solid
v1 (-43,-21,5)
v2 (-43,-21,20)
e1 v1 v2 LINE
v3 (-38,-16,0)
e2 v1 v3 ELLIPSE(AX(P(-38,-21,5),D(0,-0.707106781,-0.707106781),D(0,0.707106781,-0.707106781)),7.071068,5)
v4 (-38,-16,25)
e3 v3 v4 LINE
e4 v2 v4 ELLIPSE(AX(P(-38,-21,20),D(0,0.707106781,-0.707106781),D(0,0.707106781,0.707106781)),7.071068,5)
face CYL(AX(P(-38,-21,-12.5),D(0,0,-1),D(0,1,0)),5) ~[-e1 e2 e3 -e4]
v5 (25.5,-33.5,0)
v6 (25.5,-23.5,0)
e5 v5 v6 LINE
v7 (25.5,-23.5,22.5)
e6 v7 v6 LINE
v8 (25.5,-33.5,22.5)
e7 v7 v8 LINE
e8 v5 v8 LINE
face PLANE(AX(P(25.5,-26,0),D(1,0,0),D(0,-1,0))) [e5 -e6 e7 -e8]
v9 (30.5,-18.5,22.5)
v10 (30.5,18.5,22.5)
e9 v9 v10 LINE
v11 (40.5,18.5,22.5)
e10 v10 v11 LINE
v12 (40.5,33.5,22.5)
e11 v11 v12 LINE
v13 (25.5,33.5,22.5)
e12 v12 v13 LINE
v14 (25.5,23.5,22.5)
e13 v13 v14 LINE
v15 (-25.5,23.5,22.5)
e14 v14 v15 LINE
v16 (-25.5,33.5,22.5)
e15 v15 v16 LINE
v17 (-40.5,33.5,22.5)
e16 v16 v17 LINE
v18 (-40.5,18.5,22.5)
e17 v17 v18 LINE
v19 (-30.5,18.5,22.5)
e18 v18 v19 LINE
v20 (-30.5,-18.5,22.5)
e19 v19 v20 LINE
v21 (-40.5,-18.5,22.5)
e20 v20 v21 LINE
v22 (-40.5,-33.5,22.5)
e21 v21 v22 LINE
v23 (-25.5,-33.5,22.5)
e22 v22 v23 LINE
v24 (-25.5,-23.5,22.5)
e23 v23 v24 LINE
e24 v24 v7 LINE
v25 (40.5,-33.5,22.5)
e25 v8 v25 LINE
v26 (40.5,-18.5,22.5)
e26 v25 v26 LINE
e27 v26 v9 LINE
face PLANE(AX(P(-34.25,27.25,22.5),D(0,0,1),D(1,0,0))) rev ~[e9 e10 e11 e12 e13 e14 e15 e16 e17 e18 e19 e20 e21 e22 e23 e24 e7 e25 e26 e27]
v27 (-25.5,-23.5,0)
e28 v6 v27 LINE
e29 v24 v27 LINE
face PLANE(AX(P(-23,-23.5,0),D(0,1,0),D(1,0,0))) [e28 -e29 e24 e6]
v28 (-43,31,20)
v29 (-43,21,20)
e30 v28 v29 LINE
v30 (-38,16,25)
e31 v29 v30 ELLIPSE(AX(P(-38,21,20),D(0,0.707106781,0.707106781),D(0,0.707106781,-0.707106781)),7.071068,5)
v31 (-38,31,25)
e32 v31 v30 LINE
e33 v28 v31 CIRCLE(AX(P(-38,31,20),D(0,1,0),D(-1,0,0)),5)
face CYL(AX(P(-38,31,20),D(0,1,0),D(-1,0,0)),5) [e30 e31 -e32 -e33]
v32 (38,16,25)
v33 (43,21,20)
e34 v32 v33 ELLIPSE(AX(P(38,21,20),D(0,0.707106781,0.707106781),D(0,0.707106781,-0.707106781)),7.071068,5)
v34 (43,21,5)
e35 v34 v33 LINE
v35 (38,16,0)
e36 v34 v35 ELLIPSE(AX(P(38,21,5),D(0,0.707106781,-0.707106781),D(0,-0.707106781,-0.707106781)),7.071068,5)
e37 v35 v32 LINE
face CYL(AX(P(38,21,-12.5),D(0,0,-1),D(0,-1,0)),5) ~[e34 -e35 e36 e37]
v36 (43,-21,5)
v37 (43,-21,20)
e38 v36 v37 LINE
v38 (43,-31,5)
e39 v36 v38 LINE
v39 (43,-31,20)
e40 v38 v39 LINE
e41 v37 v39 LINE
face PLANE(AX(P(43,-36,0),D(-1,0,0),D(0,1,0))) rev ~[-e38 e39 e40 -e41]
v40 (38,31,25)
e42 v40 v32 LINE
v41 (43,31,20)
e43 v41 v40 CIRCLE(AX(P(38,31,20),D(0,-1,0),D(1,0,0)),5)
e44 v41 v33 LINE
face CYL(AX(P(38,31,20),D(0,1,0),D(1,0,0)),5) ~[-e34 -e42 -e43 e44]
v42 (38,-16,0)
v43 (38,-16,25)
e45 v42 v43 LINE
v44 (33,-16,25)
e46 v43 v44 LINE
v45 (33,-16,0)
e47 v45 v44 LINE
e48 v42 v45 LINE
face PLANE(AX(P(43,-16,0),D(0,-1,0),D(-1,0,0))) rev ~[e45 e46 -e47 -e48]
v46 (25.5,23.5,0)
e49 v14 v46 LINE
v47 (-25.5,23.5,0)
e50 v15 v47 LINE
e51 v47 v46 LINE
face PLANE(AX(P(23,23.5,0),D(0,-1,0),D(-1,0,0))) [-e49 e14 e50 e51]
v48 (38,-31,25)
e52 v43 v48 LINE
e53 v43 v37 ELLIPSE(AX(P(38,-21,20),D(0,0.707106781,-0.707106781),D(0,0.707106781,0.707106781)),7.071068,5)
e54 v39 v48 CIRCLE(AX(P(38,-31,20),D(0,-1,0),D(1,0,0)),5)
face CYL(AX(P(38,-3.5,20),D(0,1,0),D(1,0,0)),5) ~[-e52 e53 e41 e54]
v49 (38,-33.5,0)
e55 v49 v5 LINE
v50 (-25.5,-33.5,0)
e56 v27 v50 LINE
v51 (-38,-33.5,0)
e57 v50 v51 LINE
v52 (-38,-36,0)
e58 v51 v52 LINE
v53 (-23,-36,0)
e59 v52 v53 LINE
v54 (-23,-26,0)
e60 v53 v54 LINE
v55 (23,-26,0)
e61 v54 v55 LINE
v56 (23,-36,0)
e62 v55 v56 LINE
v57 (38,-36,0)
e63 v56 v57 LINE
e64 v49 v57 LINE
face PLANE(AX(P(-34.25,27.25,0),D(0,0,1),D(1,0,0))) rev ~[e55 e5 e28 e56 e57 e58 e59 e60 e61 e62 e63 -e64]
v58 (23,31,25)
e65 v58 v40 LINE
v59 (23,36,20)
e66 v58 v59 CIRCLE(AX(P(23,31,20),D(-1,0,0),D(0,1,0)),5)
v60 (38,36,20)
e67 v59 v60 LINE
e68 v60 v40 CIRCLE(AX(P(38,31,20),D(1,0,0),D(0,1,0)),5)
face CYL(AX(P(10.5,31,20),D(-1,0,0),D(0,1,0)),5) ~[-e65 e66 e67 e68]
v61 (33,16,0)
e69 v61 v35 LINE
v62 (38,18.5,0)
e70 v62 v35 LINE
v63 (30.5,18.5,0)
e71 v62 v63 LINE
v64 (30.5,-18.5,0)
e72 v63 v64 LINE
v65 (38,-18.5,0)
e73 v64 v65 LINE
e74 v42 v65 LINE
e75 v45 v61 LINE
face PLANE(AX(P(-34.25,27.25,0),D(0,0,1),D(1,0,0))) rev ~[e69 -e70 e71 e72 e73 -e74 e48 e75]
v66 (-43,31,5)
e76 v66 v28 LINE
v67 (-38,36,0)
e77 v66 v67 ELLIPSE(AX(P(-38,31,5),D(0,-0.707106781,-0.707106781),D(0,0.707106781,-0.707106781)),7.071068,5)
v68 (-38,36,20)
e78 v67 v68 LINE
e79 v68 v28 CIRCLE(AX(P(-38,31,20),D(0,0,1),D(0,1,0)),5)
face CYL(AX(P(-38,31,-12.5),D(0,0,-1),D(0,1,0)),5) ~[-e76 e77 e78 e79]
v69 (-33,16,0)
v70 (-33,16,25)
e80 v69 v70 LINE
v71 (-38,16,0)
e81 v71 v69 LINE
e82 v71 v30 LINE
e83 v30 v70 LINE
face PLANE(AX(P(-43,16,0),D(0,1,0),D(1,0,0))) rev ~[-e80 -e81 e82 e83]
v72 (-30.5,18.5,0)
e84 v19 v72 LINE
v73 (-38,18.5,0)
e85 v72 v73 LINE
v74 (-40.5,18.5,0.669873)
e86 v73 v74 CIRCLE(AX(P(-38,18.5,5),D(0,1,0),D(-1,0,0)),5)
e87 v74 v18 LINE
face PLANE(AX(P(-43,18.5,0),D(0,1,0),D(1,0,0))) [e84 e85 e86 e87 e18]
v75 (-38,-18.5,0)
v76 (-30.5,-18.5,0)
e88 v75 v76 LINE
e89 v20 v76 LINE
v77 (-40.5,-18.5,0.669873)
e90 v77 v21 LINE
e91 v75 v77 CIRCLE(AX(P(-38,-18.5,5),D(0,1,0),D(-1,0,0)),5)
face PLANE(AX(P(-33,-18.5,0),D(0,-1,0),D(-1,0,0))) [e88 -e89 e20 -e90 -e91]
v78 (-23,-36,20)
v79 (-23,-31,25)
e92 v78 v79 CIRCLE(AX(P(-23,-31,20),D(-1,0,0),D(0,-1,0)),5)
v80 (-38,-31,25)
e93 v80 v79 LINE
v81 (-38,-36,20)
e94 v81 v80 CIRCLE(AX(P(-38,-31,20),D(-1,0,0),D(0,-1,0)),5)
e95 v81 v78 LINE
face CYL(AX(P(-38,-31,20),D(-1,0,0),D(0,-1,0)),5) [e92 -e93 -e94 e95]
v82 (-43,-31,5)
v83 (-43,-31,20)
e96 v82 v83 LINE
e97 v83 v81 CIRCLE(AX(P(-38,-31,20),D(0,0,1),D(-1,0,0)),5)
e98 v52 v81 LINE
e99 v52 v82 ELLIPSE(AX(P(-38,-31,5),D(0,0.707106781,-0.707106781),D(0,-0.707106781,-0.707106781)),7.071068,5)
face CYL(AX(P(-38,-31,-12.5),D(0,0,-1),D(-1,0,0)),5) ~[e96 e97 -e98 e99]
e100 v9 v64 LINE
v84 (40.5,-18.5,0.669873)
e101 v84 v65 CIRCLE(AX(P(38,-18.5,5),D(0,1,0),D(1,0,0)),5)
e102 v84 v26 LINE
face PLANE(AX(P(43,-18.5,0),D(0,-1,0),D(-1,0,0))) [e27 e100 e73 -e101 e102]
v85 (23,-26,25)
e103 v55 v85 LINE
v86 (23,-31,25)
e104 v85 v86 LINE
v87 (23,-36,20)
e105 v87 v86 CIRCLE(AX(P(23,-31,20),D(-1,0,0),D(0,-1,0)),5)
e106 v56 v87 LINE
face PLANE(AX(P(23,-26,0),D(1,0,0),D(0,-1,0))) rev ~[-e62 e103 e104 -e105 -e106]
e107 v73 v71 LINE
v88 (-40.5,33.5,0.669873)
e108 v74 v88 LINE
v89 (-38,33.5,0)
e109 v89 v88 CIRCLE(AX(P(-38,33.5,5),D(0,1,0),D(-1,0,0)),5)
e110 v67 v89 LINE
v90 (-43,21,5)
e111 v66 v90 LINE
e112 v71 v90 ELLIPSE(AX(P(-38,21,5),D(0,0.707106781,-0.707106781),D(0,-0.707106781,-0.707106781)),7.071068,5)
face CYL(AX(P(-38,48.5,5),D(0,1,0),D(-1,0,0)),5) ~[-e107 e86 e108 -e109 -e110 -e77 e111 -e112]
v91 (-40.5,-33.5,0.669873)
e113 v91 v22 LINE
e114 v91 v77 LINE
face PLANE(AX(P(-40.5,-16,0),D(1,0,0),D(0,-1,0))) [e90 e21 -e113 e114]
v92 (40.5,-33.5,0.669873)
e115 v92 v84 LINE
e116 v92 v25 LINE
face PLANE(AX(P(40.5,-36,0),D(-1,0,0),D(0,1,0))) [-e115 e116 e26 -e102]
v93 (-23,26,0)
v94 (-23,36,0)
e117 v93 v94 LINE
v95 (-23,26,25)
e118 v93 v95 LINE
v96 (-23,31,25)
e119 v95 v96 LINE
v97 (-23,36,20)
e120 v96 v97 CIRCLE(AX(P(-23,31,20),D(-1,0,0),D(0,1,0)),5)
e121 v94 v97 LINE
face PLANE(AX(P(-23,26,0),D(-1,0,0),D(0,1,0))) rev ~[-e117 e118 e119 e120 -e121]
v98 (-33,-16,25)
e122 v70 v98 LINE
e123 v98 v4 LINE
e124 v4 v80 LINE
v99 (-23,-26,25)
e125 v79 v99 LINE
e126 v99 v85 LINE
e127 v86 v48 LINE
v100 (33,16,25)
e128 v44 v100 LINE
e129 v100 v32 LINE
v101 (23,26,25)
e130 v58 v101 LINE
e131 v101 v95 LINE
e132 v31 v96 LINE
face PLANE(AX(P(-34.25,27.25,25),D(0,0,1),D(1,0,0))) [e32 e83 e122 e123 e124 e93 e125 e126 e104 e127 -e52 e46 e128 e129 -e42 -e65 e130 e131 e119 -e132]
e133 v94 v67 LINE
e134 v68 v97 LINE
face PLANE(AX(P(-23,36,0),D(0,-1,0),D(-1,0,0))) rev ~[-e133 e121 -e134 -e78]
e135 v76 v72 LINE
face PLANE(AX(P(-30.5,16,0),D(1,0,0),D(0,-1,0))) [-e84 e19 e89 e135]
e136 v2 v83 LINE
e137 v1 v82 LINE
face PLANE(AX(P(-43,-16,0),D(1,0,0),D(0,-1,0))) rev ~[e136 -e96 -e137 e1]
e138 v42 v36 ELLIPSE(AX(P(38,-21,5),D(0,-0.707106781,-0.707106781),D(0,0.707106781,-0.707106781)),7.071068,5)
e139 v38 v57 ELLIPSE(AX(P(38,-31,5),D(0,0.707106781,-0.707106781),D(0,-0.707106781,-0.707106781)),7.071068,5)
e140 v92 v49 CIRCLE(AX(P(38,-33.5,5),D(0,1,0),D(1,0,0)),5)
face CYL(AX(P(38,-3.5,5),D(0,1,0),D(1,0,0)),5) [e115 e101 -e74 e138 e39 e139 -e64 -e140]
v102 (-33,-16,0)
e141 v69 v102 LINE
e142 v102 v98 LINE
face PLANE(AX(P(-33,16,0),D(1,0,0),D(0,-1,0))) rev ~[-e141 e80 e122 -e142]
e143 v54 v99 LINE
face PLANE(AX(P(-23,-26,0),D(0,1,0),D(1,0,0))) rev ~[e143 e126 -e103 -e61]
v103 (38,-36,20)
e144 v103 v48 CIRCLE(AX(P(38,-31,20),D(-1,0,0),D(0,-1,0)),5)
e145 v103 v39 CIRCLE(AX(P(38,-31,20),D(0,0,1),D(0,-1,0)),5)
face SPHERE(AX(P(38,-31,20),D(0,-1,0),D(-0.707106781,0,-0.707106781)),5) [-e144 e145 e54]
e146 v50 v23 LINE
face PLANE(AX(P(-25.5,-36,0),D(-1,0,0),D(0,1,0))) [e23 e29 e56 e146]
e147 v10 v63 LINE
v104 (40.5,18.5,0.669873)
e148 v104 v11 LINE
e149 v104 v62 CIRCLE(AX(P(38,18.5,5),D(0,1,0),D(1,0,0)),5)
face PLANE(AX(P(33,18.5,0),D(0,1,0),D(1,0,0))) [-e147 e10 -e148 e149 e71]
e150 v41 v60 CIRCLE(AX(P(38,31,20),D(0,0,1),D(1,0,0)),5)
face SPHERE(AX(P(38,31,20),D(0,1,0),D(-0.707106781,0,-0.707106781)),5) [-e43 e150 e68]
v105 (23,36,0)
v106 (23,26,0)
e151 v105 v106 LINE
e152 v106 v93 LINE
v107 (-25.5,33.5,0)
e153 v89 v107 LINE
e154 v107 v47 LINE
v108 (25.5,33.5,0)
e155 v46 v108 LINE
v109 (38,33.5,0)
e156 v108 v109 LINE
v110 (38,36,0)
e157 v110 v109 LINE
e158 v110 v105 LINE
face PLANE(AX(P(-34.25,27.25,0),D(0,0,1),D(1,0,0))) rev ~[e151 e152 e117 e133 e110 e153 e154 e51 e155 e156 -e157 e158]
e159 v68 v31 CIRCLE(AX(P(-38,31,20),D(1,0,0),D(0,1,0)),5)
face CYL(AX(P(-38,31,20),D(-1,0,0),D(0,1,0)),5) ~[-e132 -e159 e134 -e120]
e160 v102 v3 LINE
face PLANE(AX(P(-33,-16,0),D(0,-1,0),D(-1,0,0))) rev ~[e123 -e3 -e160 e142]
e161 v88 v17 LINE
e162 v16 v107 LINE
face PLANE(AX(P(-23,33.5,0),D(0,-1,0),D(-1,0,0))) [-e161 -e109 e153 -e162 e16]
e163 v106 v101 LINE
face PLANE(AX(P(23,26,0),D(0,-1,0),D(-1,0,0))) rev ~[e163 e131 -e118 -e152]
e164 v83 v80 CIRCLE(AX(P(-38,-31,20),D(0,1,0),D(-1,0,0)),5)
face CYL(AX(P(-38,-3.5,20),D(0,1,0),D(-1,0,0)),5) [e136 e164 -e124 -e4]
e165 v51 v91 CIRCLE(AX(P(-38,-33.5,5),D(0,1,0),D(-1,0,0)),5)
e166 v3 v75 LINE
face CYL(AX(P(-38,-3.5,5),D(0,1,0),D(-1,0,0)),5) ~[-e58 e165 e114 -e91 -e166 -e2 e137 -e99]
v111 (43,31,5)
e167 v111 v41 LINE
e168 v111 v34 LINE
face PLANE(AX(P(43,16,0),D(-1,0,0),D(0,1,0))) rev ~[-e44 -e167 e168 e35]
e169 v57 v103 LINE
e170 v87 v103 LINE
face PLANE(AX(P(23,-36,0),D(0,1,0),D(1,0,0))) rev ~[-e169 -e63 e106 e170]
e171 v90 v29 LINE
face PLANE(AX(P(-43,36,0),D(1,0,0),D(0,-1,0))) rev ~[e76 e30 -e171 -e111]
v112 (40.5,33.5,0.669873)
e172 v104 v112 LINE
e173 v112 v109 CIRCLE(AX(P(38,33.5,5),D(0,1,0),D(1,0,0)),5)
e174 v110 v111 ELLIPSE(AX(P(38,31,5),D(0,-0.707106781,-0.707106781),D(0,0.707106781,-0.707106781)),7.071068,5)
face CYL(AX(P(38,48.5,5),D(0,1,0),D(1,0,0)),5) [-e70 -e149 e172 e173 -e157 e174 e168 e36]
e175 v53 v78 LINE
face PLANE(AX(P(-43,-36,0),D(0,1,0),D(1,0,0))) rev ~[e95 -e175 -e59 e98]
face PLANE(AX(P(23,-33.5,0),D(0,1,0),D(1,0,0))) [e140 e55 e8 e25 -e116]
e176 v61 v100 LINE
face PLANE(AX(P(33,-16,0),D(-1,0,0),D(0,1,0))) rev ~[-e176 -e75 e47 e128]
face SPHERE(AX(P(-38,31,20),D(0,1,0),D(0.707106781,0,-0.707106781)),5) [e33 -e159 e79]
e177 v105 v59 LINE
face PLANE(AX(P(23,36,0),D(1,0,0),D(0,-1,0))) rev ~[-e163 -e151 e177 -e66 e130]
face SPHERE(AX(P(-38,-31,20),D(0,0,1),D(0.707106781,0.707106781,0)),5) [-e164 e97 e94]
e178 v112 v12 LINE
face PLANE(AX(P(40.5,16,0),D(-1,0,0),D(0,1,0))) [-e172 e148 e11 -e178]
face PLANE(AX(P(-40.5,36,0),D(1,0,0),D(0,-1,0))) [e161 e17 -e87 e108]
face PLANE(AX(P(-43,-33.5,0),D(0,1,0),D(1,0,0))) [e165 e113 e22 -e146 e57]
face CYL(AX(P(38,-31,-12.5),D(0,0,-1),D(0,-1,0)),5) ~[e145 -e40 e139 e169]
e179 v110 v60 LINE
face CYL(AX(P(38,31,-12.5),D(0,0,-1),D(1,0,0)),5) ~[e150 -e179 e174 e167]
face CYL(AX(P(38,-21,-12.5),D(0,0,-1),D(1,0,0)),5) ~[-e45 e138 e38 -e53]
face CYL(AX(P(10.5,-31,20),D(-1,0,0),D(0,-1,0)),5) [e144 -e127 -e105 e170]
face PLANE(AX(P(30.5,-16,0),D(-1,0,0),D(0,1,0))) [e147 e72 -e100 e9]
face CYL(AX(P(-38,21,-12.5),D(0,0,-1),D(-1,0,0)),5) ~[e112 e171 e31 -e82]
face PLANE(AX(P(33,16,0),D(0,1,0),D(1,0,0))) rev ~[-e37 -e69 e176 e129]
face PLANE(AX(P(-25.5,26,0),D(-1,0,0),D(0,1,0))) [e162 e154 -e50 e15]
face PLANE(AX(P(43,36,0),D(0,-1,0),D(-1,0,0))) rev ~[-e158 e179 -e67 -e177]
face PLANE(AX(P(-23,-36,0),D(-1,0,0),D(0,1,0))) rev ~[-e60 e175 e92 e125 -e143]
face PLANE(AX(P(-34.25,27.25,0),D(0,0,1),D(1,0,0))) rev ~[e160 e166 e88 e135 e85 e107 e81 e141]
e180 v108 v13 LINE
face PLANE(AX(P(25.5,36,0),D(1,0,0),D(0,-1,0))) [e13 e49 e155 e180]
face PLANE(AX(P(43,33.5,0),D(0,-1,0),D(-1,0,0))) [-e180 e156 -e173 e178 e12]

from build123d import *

# Parameters (mm, degrees)
F0_W         = 10
F0_H         = 10
F1_DEPTH     = 25
F2_T         = -2.5
F3_T1_DEPTH  = 27.5
F3_T3_DEPTH  = 27.5
F3_T5_DEPTH  = 27.5
F3_T7_DEPTH  = 27.5
F3_T9_DEPTH  = 32.5
F3_T11_DEPTH = 50
F3_T13_DEPTH = 45
F3_T15_DEPTH = 45
F3_S19_W     = 5
F3_S19_H     = 5
F3_T20_DEPTH = 5
F3_S25_W     = 5
F3_S25_H     = 5
F3_T26_DEPTH = 5
F3_S31_W     = 5
F3_S31_H     = 5
F3_T32_DEPTH = 5
F3_S37_W     = 5
F3_S37_H     = 5
F3_T38_DEPTH = 5


# Not quite as in the source:
# - a fillet or chamfer that OpenCascade refuses, or shapes differently, is made with other operations: its cross-section is extruded or revolved along the edge and cut away or added


with BuildPart() as f1:
    # F0 (on Top) → F1 (new body)
    with BuildSketch(Plane.XY):
        Polygon((-33, 16), (-33, 26), (-23, 26), (-23, 36), (-43, 36), (-43, 16), align=None)
        with Locations((-28, 21)):
            Rectangle(F0_W, F0_H)
        Polygon((23, 26), (-23, 26), (-23, 16), (-33, 16), (-33, -16), (-23, -16), (-23, -26), (23, -26), (23, -16), (33, -16), (33, 16), (23, 16), align=None)
        Polygon((23, 36), (23, 26), (33, 26), (33, 16), (43, 16), (43, 36), align=None)
        with Locations((28, 21)):
            Rectangle(F0_W, F0_H)
        with Locations((-28, -21)):
            Rectangle(F0_W, F0_H)
        Polygon((-33, -26), (-33, -16), (-43, -16), (-43, -36), (-23, -36), (-23, -26), align=None)
        Polygon((43, -16), (33, -16), (33, -26), (23, -26), (23, -36), (43, -36), align=None)
        with Locations((28, -21)):
            Rectangle(F0_W, F0_H)
    extrude(amount=F1_DEPTH)

    # F2
    f2_openings = [f1.faces().sort_by_distance(p)[0] for p in [
        (0, 0, 0),
    ]]
    offset(amount=F2_T, openings=f2_openings, kind=Kind.INTERSECTION)

    # F3: fillet of radius 5 on 20 edges, made by hand

    # F3_s2 → F3_t1 (cut)
    with BuildSketch(Plane.YZ.offset(-38)):
        with BuildLine():
            ThreePointArc((36, 20), (34.5355339059, 23.5355339059), (31, 25))
            Line((31, 25), (36, 25))
            Line((36, 25), (36, 20))
        make_face()
        with BuildLine():
            ThreePointArc((-36, 20), (-34.5355339059, 23.5355339059), (-31, 25))
            Line((-31, 25), (-36, 25))
            Line((-36, 25), (-36, 20))
        make_face()
    extrude(amount=F3_T1_DEPTH, mode=Mode.SUBTRACT)

    # F3_s4 → F3_t3 (cut)
    with BuildSketch(Plane.YZ.offset(10.5)):
        with BuildLine():
            ThreePointArc((-36, 20), (-34.5355339059, 23.5355339059), (-31, 25))
            Line((-31, 25), (-36, 25))
            Line((-36, 25), (-36, 20))
        make_face()
        with BuildLine():
            ThreePointArc((36, 20), (34.5355339059, 23.5355339059), (31, 25))
            Line((31, 25), (36, 25))
            Line((36, 25), (36, 20))
        make_face()
    extrude(amount=F3_T3_DEPTH, mode=Mode.SUBTRACT)

    # F3_s6 → F3_t5 (cut)
    with BuildSketch(Plane.XZ.offset(-31)):
        with BuildLine():
            ThreePointArc((43, 20), (41.5355339059, 23.5355339059), (38, 25))
            Line((38, 25), (43, 25))
            Line((43, 25), (43, 20))
        make_face()
        with BuildLine():
            ThreePointArc((-43, 20), (-41.5355339059, 23.5355339059), (-38, 25))
            Line((-38, 25), (-43, 25))
            Line((-43, 25), (-43, 20))
        make_face()
    extrude(amount=F3_T5_DEPTH, mode=Mode.SUBTRACT)

    # F3_s8 → F3_t7 (cut)
    with BuildSketch(Plane.XZ.offset(3.5)):
        with BuildLine():
            ThreePointArc((43, 20), (41.5355339059, 23.5355339059), (38, 25))
            Line((38, 25), (43, 25))
            Line((43, 25), (43, 20))
        make_face()
        with BuildLine():
            ThreePointArc((-43, 20), (-41.5355339059, 23.5355339059), (-38, 25))
            Line((-38, 25), (-43, 25))
            Line((-43, 25), (-43, 20))
        make_face()
    extrude(amount=F3_T7_DEPTH, mode=Mode.SUBTRACT)

    # F3_s10 → F3_t9 (cut)
    with BuildSketch(Plane.XY.offset(-12.5)):
        with BuildLine():
            ThreePointArc((-38, 36), (-41.5355339059, 34.5355339059), (-43, 31))
            Line((-43, 31), (-43, 36))
            Line((-43, 36), (-38, 36))
        make_face()
        with BuildLine():
            ThreePointArc((43, 31), (41.5355339059, 34.5355339059), (38, 36))
            Line((38, 36), (43, 36))
            Line((43, 36), (43, 31))
        make_face()
        with BuildLine():
            ThreePointArc((38, -36), (41.5355339059, -34.5355339059), (43, -31))
            Line((43, -31), (43, -36))
            Line((43, -36), (38, -36))
        make_face()
        with BuildLine():
            ThreePointArc((-43, -31), (-41.5355339059, -34.5355339059), (-38, -36))
            Line((-38, -36), (-43, -36))
            Line((-43, -36), (-43, -31))
        make_face()
    extrude(amount=F3_T9_DEPTH, mode=Mode.SUBTRACT)

    # F3_s12 → F3_t11 (cut)
    with BuildSketch(Plane.XY.offset(-12.5)):
        with BuildLine():
            ThreePointArc((-43, 21), (-41.5355339059, 17.4644660941), (-38, 16))
            Line((-38, 16), (-43, 16))
            Line((-43, 16), (-43, 21))
        make_face()
        with BuildLine():
            ThreePointArc((38, 16), (41.5355339059, 17.4644660941), (43, 21))
            Line((43, 21), (43, 16))
            Line((43, 16), (38, 16))
        make_face()
        with BuildLine():
            ThreePointArc((43, -21), (41.5355339059, -17.4644660941), (38, -16))
            Line((38, -16), (43, -16))
            Line((43, -16), (43, -21))
        make_face()
        with BuildLine():
            ThreePointArc((-38, -16), (-41.5355339059, -17.4644660941), (-43, -21))
            Line((-43, -21), (-43, -16))
            Line((-43, -16), (-38, -16))
        make_face()
    extrude(amount=F3_T11_DEPTH, mode=Mode.SUBTRACT)

    # F3_s14 → F3_t13 (cut)
    with BuildSketch(Plane.XZ.offset(-48.5)):
        with BuildLine():
            ThreePointArc((-43, 5), (-41.5355339059, 1.4644660941), (-38, 0))
            Line((-38, 0), (-43, 0))
            Line((-43, 0), (-43, 5))
        make_face()
        with BuildLine():
            ThreePointArc((43, 5), (41.5355339059, 1.4644660941), (38, 0))
            Line((38, 0), (43, 0))
            Line((43, 0), (43, 5))
        make_face()
    extrude(amount=F3_T13_DEPTH, mode=Mode.SUBTRACT)

    # F3_s16 → F3_t15 (cut)
    with BuildSketch(Plane.XZ.offset(3.5)):
        with BuildLine():
            ThreePointArc((43, 5), (41.5355339059, 1.4644660941), (38, 0))
            Line((38, 0), (43, 0))
            Line((43, 0), (43, 5))
        make_face()
        with BuildLine():
            ThreePointArc((-43, 5), (-41.5355339059, 1.4644660941), (-38, 0))
            Line((-38, 0), (-43, 0))
            Line((-43, 0), (-43, 5))
        make_face()
    extrude(amount=F3_T15_DEPTH, mode=Mode.SUBTRACT)


with BuildPart() as f3_tool18:
    # F3_s19 → F3_t20 (new body)
    with BuildSketch(Plane.XZ.offset(-31)):
        with Locations((-40.5, 22.5)):
            Rectangle(F3_S19_W, F3_S19_H)
    extrude(amount=-F3_T20_DEPTH)

    # F3_s21 → F3_t22 (revolve, cut)
    with BuildSketch(Plane(origin=(-38, 31, 20), x_dir=(0.7071067812, 0, -0.7071067812), z_dir=(0.7071067812, 0, 0.7071067812))):
        with BuildLine():
            ThreePointArc((0, -5), (5, 0), (0, 5))
            Line((0, 5), (0, -5))
        make_face()
    revolve(axis=Axis((-38, 31, 20), (0, 1, 0)), mode=Mode.SUBTRACT)


with BuildPart() as f1_1:
    add(f1.part)

    # F3_t17: cut F3_tool18
    add(f3_tool18.part, mode=Mode.SUBTRACT)


with BuildPart() as f3_tool24:
    # F3_s25 → F3_t26 (new body)
    with BuildSketch(Plane.XY.offset(20)):
        with Locations((-40.5, -33.5)):
            Rectangle(F3_S25_W, F3_S25_H)
    extrude(amount=F3_T26_DEPTH)

    # F3_s27 → F3_t28 (revolve, cut)
    with BuildSketch(Plane(origin=(-38, -31, 20), x_dir=(0.7071067812, 0.7071067812, 0), z_dir=(0.7071067812, -0.7071067812, 0))):
        with BuildLine():
            ThreePointArc((0, -5), (5, 0), (0, 5))
            Line((0, 5), (0, -5))
        make_face()
    revolve(axis=Axis((-38, -31, 20), (0, 0, 1)), mode=Mode.SUBTRACT)


with BuildPart() as f1_2:
    add(f1_1.part)

    # F3_t23: cut F3_tool24
    add(f3_tool24.part, mode=Mode.SUBTRACT)


with BuildPart() as f3_tool30:
    # F3_s31 → F3_t32 (new body)
    with BuildSketch(Plane.XZ.offset(31)):
        with Locations((40.5, 22.5)):
            Rectangle(F3_S31_W, F3_S31_H)
    extrude(amount=F3_T32_DEPTH)

    # F3_s33 → F3_t34 (revolve, cut)
    with BuildSketch(Plane(origin=(38, -31, 20), x_dir=(-0.7071067812, 0, -0.7071067812), z_dir=(-0.7071067812, 0, 0.7071067812))):
        with BuildLine():
            ThreePointArc((0, -5), (5, 0), (0, 5))
            Line((0, 5), (0, -5))
        make_face()
    revolve(axis=Axis((38, -31, 20), (0, -1, 0)), mode=Mode.SUBTRACT)


with BuildPart() as f1_3:
    add(f1_2.part)

    # F3_t29: cut F3_tool30
    add(f3_tool30.part, mode=Mode.SUBTRACT)


with BuildPart() as f3_tool36:
    # F3_s37 → F3_t38 (new body)
    with BuildSketch(Plane.XZ.offset(-31)):
        with Locations((40.5, 22.5)):
            Rectangle(F3_S37_W, F3_S37_H)
    extrude(amount=-F3_T38_DEPTH)

    # F3_s39 → F3_t40 (revolve, cut)
    with BuildSketch(Plane(origin=(38, 31, 20), x_dir=(-0.7071067812, 0, -0.7071067812), z_dir=(0.7071067812, 0, -0.7071067812))):
        with BuildLine():
            ThreePointArc((0, -5), (5, 0), (0, 5))
            Line((0, 5), (0, -5))
        make_face()
    revolve(axis=Axis((38, 31, 20), (0, 1, 0)), mode=Mode.SUBTRACT)


with BuildPart() as f1_4:
    add(f1_3.part)

    # F3_t35: cut F3_tool36
    add(f3_tool36.part, mode=Mode.SUBTRACT)


solid = f1_4.part
